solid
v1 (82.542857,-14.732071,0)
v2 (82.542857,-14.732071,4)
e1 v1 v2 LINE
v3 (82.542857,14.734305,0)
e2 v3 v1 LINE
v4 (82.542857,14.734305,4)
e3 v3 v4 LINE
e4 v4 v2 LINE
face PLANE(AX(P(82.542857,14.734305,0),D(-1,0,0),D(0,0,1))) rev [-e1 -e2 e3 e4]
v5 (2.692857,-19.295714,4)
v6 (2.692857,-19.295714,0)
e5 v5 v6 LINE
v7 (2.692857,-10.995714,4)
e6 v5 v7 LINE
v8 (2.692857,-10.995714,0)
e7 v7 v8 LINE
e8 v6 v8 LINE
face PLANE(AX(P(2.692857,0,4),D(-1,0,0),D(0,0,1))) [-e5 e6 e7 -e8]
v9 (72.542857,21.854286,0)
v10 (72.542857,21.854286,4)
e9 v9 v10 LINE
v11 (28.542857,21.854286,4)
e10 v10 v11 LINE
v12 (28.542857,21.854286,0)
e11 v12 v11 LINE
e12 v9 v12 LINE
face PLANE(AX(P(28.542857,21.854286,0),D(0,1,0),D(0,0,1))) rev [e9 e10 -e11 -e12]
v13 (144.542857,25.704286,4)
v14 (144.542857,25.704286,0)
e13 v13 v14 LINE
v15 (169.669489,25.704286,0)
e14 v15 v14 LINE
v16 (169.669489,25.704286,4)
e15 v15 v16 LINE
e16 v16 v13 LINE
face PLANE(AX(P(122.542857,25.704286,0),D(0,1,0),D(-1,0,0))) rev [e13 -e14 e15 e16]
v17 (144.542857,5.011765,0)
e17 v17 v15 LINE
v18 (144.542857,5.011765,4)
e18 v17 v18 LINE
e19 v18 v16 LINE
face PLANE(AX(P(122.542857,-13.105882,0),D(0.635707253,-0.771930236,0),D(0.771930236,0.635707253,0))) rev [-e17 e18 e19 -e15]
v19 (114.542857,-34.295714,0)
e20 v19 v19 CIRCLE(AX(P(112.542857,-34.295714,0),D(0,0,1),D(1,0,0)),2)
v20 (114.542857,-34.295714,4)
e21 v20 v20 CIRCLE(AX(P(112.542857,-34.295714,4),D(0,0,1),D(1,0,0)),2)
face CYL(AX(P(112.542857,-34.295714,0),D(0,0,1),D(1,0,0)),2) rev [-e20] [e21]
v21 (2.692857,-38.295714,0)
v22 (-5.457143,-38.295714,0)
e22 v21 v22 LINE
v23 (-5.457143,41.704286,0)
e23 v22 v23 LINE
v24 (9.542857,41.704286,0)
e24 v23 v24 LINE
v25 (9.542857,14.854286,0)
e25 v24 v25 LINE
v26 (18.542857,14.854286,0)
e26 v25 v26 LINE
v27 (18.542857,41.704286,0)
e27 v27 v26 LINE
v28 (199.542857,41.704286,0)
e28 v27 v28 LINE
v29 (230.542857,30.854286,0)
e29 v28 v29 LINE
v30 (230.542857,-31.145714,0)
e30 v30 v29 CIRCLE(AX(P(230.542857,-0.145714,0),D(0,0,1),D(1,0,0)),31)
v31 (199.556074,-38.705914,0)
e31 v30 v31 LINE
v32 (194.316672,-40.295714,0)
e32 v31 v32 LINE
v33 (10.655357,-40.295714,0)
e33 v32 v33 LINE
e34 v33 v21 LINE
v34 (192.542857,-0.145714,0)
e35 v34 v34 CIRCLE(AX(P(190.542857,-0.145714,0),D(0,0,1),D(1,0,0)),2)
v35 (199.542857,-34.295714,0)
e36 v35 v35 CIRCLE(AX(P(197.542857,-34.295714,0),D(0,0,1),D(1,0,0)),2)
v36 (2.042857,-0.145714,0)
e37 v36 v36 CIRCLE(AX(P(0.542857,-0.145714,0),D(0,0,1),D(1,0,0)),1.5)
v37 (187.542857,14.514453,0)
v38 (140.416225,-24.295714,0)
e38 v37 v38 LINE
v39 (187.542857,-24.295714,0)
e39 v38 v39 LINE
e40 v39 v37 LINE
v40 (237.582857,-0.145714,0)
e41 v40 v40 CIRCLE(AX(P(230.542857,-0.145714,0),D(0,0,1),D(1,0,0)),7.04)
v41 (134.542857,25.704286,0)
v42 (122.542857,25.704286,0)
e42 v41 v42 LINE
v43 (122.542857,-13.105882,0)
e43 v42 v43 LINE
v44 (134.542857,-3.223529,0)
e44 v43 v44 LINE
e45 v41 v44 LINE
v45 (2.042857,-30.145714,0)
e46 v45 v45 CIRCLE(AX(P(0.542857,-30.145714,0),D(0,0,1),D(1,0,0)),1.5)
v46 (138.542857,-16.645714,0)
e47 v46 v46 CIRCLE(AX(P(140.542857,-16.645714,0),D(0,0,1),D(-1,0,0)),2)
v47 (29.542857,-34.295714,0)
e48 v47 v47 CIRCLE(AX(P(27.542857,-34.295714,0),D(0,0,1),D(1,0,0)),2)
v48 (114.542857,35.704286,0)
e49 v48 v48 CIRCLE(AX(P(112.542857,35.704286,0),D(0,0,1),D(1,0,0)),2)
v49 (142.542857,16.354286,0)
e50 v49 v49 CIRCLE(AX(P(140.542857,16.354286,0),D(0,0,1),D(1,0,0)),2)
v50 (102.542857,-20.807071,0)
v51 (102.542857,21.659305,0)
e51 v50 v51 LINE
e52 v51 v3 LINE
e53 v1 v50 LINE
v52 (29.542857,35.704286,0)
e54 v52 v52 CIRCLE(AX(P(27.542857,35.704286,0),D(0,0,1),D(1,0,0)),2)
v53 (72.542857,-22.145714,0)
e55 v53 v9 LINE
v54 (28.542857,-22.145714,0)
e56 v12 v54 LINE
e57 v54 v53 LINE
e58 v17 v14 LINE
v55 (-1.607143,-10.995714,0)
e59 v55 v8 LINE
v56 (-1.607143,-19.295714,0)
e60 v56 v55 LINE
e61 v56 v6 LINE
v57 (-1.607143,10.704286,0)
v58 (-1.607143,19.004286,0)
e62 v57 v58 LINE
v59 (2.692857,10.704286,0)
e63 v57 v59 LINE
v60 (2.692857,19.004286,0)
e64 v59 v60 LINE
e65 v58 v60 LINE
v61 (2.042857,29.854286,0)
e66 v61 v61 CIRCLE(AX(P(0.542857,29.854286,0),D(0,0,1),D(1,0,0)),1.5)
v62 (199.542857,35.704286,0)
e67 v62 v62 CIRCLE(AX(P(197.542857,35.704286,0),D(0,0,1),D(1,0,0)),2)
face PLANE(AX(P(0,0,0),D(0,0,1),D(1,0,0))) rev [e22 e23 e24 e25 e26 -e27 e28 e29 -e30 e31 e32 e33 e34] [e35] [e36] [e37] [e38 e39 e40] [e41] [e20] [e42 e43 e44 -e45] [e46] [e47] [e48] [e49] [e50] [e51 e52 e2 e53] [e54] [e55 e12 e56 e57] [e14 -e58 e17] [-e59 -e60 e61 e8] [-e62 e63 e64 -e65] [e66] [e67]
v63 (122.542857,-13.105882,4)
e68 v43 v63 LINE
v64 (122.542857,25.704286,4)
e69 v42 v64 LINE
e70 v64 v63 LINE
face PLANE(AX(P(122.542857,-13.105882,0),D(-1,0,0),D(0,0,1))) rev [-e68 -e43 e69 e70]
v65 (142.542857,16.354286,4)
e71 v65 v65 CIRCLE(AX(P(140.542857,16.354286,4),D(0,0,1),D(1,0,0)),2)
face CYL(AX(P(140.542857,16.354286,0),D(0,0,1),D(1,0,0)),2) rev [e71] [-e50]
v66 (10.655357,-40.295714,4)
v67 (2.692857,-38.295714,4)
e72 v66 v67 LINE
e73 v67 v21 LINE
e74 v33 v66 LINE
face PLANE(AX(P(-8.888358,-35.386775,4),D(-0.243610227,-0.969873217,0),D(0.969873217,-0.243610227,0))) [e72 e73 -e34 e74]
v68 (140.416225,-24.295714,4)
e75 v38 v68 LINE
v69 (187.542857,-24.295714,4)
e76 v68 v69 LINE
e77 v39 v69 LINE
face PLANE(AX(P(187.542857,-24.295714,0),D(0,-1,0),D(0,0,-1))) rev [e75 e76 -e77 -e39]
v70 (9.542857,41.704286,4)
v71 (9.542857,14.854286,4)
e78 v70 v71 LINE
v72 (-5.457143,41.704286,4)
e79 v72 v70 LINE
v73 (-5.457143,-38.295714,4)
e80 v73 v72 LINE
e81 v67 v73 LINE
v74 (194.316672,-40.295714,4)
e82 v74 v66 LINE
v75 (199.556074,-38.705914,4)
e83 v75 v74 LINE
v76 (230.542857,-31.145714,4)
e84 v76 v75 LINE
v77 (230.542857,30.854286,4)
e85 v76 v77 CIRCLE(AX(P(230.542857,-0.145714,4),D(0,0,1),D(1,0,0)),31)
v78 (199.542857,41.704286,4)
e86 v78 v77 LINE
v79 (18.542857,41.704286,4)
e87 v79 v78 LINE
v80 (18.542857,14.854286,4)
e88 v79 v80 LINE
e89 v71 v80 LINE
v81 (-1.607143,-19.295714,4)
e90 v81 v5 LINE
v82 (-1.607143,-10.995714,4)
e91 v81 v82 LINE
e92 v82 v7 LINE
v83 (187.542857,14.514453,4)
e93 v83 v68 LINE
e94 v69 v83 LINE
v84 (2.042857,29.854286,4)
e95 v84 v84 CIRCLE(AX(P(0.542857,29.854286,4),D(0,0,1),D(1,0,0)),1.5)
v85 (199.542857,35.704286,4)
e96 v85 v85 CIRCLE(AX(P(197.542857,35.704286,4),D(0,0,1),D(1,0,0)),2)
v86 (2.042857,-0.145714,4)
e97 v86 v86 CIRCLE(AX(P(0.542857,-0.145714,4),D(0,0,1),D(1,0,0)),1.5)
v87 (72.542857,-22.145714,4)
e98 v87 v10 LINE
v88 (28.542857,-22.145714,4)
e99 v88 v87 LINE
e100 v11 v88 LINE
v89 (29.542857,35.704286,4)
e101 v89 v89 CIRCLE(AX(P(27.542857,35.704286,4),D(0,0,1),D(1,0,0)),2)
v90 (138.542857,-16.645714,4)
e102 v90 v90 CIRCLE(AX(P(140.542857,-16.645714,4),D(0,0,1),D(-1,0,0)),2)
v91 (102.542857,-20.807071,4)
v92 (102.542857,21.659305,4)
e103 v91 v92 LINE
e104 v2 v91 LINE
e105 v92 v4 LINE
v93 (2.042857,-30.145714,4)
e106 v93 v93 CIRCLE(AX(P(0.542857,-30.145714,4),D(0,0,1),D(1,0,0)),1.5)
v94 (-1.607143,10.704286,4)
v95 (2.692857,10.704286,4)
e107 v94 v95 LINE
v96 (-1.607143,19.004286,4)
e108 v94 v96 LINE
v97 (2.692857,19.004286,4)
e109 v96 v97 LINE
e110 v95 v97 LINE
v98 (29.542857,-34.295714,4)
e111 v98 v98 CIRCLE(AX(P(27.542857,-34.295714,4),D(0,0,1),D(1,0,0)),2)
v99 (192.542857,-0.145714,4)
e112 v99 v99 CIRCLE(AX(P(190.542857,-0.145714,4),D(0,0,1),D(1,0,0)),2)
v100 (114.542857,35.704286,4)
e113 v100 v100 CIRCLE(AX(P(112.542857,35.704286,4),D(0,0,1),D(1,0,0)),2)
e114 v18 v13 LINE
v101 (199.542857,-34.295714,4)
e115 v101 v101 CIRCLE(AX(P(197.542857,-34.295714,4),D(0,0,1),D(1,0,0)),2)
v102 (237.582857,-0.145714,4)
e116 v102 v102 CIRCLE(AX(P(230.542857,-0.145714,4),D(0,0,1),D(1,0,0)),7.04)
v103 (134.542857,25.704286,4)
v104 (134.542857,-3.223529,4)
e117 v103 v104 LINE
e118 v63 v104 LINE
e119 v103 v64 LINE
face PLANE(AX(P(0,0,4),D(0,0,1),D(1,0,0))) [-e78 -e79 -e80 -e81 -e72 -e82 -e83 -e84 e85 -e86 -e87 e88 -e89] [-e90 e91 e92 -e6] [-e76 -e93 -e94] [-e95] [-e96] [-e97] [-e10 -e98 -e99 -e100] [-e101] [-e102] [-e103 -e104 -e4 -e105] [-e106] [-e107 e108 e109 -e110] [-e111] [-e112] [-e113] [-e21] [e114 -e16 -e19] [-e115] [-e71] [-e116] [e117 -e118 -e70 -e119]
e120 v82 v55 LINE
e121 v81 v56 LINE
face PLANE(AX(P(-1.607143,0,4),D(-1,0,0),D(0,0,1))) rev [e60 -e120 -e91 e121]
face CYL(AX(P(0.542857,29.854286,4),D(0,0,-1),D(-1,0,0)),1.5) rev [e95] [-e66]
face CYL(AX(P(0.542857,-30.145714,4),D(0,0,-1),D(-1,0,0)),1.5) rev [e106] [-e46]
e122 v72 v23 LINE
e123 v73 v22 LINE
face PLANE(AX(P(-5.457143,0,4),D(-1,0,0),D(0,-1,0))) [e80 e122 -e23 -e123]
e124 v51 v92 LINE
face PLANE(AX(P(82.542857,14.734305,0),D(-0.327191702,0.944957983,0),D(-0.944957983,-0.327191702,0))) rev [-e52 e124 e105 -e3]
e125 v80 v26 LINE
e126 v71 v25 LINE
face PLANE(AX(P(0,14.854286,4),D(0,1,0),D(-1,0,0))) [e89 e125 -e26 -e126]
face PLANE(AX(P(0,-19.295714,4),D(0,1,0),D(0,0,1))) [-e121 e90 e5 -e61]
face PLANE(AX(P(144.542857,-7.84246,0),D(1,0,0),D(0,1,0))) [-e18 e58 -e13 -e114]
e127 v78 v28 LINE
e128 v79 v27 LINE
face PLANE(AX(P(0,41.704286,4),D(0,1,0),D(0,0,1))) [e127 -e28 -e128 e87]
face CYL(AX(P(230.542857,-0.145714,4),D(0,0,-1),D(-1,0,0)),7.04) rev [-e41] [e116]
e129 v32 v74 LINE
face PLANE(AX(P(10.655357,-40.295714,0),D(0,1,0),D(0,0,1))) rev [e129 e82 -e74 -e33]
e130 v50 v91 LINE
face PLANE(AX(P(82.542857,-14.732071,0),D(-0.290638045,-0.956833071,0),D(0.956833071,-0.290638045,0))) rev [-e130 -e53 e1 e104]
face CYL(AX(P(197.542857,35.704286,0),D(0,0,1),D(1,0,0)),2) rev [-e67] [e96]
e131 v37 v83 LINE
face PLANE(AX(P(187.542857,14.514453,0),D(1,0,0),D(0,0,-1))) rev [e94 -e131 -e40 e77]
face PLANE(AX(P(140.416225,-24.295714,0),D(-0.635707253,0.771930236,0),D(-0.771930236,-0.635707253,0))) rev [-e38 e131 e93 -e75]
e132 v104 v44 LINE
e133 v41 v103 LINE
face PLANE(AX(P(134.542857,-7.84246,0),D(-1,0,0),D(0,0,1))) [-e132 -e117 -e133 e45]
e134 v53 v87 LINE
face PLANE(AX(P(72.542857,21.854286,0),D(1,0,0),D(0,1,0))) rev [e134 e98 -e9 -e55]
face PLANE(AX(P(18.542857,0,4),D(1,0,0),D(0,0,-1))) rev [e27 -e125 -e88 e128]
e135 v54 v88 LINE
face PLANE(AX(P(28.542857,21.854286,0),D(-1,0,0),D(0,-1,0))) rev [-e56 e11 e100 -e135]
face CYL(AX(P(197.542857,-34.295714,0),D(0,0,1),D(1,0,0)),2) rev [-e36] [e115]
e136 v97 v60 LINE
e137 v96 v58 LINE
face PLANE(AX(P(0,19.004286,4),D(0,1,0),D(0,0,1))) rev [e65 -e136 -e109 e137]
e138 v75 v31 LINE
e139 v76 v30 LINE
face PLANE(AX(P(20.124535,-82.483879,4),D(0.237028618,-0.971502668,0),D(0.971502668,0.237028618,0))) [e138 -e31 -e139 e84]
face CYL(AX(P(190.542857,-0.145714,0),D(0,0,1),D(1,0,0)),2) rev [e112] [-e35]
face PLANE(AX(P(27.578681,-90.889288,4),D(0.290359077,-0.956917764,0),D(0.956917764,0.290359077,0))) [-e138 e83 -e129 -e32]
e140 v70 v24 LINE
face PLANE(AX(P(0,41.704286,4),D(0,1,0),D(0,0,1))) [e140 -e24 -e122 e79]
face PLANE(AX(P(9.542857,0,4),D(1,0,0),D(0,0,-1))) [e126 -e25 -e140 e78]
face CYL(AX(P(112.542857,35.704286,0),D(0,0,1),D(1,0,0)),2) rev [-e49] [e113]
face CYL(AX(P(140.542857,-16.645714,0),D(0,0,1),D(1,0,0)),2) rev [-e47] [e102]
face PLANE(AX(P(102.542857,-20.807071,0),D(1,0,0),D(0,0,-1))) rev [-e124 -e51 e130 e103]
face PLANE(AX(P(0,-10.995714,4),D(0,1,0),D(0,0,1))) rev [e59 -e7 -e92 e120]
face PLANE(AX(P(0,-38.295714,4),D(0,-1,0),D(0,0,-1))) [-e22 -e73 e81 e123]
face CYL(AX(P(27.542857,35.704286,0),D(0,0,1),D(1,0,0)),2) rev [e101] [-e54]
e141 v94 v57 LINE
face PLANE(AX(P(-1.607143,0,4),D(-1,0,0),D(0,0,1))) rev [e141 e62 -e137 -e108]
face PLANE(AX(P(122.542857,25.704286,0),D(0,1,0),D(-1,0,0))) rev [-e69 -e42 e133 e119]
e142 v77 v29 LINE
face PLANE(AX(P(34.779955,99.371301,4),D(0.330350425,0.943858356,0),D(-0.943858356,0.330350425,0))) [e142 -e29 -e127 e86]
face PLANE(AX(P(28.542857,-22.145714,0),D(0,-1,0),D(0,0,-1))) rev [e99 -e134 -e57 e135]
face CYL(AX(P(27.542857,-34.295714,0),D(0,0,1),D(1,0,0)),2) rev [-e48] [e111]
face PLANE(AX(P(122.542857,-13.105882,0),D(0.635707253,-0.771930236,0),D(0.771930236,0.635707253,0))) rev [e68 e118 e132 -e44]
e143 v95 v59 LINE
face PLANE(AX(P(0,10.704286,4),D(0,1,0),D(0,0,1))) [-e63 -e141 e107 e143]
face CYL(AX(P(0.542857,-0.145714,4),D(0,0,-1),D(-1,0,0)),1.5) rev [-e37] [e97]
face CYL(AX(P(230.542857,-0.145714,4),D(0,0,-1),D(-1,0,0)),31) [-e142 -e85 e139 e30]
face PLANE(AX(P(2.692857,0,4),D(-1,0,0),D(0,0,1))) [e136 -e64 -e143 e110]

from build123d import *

# Parameters (mm, degrees)
EXTRUDE_1_OUTLINE_R   = 1.5
EXTRUDE_1_OUTLINE_W   = 4.3
EXTRUDE_1_OUTLINE_H   = 8.3
EXTRUDE_1_OUTLINE_R_2 = 11.5
EXTRUDE_1_OUTLINE_R_3 = 7.04
EXTRUDE_1_DEPTH       = 4
SKETCH_2_W            = 44
SKETCH_2_H            = 44
CUT_EXTRUDE_1_DEPTH   = 4
SKETCH_3_R            = 2
CUT_EXTRUDE_2_DEPTH   = 4
SKETCH_4_W            = 10
SKETCH_4_H            = 47.093490756
EXTRUDE_2_DEPTH       = 4
SKETCH_7_R            = 2
CUT_EXTRUDE_3_DEPTH   = 4


# Read off the part's stored shape, not the designer's step: 凸台-拉伸1
with BuildPart() as part:
    # 凸台-拉伸1 outline → 凸台-拉伸1 (new body)
    with BuildSketch(Plane.XY):
        with BuildLine():
            Line((174.542857143, -46.295714286), (199.556073527, -38.70591431))
            Line((199.556073527, -38.70591431), (230.542857143, -31.145714286))
            ThreePointArc((230.542857143, -31.145714286), (261.542857143, -0.145714286), (230.542857143, 30.854285714))
            Line((230.542857143, 30.854285714), (199.542857143, 41.704285714))
            Line((199.542857143, 41.704285714), (18.542857143, 41.704285714))
            Line((18.542857143, 41.704285714), (18.542857143, 14.854285714))
            Line((18.542857143, 14.854285714), (9.542857143, 14.854285714))
            Line((9.542857143, 14.854285714), (9.542857143, 41.704285714))
            Line((9.542857143, 41.704285714), (-5.457142857, 41.704285714))
            Line((-5.457142857, 41.704285714), (-5.457142857, -38.295714286))
            Line((-5.457142857, -38.295714286), (2.692857143, -38.295714286))
            Line((2.692857143, -38.295714286), (34.542857143, -46.295714286))
            Line((34.542857143, -46.295714286), (174.542857143, -46.295714286))
        make_face()
        with Locations((0.542857143, -30.145714286)):
            Circle(EXTRUDE_1_OUTLINE_R, mode=Mode.SUBTRACT)
        with Locations((0.542857143, -15.145714286)):
            Rectangle(EXTRUDE_1_OUTLINE_W, EXTRUDE_1_OUTLINE_H, mode=Mode.SUBTRACT)
        with Locations((50.542857143, -14.145714286)):
            Circle(EXTRUDE_1_OUTLINE_R, mode=Mode.SUBTRACT)
        with Locations((0.542857143, -0.145714286)):
            Circle(EXTRUDE_1_OUTLINE_R, mode=Mode.SUBTRACT)
        with Locations((36.542857143, -0.145714286)):
            Circle(EXTRUDE_1_OUTLINE_R, mode=Mode.SUBTRACT)
        with Locations((50.542857143, -0.145714286)):
            Circle(EXTRUDE_1_OUTLINE_R_2, mode=Mode.SUBTRACT)
        with Locations((0.542857143, 14.854285714)):
            Rectangle(EXTRUDE_1_OUTLINE_W, EXTRUDE_1_OUTLINE_H, mode=Mode.SUBTRACT)
        with Locations((50.542857143, 13.854285714)):
            Circle(EXTRUDE_1_OUTLINE_R, mode=Mode.SUBTRACT)
        with Locations((64.542857143, -0.145714286)):
            Circle(EXTRUDE_1_OUTLINE_R, mode=Mode.SUBTRACT)
        with Locations((0.542857143, 29.854285714)):
            Circle(EXTRUDE_1_OUTLINE_R, mode=Mode.SUBTRACT)
        with Locations((230.542857143, -0.145714286)):
            Circle(EXTRUDE_1_OUTLINE_R_3, mode=Mode.SUBTRACT)
    extrude(amount=EXTRUDE_1_DEPTH)

    # 草图2 → 切除-拉伸1 (cut)
    with BuildSketch(Plane.XY.offset(4)):
        with Locations((50.542857143, -0.145714286)):
            Rectangle(SKETCH_2_W, SKETCH_2_H)
    extrude(amount=-CUT_EXTRUDE_1_DEPTH, mode=Mode.SUBTRACT)

    # 草图3 → 切除-拉伸2 (cut)
    with BuildSketch(Plane.XY.offset(4)):
        with Locations((27.542857143, 35.704285714)):
            Circle(SKETCH_3_R)
        with Locations((112.542857143, 35.704285714)):
            Circle(SKETCH_3_R)
        with Locations((197.542857143, 35.704285714)):
            Circle(SKETCH_3_R)
        with Locations((112.542857143, -34.295714286)):
            Circle(SKETCH_3_R)
        with Locations((197.542857143, -34.295714286)):
            Circle(SKETCH_3_R)
        with Locations((27.542857143, -34.295714286)):
            Circle(SKETCH_3_R)
        Polygon((187.542857143, -24.295714286), (140.41622539, -24.295714286), (187.542857143, 14.51445304), align=None)
        Polygon((122.542857143, 25.704285714), (169.669488896, 25.704285714), (122.542857143, -13.105881612), align=None)
        Polygon((82.542857143, 14.734304613), (102.542857143, 21.659304613), (102.542857143, -20.807070509), (82.542857143, -14.732070509), align=None)
    extrude(amount=-CUT_EXTRUDE_2_DEPTH, mode=Mode.SUBTRACT)

    # 草图4 → 凸台-拉伸2 (add)
    with BuildSketch(Plane.XY.offset(4)):
        with Locations((139.542857143, 15.704285714)):
            Rectangle(SKETCH_4_W, SKETCH_4_H)
    extrude(amount=-EXTRUDE_2_DEPTH)

    # 草图7 → 切除-拉伸3 (cut)
    with BuildSketch(Plane.XY.offset(4)):
        with Locations((190.542857143, -0.145714286)):
            Circle(SKETCH_7_R)
        with Locations((140.542857143, 16.354285714)):
            Circle(SKETCH_7_R)
        with Locations(Location((140.542857143, -16.645714286, 0), (0, 0, 180))):
            Circle(SKETCH_7_R)
        Polygon((10.655357143, -40.295714286), (194.316671838, -40.295714286), (206.19710926, -67.618852766), (10.655357143, -65.874099546), align=None)
    extrude(amount=-CUT_EXTRUDE_3_DEPTH, mode=Mode.SUBTRACT)


solid = part.part
